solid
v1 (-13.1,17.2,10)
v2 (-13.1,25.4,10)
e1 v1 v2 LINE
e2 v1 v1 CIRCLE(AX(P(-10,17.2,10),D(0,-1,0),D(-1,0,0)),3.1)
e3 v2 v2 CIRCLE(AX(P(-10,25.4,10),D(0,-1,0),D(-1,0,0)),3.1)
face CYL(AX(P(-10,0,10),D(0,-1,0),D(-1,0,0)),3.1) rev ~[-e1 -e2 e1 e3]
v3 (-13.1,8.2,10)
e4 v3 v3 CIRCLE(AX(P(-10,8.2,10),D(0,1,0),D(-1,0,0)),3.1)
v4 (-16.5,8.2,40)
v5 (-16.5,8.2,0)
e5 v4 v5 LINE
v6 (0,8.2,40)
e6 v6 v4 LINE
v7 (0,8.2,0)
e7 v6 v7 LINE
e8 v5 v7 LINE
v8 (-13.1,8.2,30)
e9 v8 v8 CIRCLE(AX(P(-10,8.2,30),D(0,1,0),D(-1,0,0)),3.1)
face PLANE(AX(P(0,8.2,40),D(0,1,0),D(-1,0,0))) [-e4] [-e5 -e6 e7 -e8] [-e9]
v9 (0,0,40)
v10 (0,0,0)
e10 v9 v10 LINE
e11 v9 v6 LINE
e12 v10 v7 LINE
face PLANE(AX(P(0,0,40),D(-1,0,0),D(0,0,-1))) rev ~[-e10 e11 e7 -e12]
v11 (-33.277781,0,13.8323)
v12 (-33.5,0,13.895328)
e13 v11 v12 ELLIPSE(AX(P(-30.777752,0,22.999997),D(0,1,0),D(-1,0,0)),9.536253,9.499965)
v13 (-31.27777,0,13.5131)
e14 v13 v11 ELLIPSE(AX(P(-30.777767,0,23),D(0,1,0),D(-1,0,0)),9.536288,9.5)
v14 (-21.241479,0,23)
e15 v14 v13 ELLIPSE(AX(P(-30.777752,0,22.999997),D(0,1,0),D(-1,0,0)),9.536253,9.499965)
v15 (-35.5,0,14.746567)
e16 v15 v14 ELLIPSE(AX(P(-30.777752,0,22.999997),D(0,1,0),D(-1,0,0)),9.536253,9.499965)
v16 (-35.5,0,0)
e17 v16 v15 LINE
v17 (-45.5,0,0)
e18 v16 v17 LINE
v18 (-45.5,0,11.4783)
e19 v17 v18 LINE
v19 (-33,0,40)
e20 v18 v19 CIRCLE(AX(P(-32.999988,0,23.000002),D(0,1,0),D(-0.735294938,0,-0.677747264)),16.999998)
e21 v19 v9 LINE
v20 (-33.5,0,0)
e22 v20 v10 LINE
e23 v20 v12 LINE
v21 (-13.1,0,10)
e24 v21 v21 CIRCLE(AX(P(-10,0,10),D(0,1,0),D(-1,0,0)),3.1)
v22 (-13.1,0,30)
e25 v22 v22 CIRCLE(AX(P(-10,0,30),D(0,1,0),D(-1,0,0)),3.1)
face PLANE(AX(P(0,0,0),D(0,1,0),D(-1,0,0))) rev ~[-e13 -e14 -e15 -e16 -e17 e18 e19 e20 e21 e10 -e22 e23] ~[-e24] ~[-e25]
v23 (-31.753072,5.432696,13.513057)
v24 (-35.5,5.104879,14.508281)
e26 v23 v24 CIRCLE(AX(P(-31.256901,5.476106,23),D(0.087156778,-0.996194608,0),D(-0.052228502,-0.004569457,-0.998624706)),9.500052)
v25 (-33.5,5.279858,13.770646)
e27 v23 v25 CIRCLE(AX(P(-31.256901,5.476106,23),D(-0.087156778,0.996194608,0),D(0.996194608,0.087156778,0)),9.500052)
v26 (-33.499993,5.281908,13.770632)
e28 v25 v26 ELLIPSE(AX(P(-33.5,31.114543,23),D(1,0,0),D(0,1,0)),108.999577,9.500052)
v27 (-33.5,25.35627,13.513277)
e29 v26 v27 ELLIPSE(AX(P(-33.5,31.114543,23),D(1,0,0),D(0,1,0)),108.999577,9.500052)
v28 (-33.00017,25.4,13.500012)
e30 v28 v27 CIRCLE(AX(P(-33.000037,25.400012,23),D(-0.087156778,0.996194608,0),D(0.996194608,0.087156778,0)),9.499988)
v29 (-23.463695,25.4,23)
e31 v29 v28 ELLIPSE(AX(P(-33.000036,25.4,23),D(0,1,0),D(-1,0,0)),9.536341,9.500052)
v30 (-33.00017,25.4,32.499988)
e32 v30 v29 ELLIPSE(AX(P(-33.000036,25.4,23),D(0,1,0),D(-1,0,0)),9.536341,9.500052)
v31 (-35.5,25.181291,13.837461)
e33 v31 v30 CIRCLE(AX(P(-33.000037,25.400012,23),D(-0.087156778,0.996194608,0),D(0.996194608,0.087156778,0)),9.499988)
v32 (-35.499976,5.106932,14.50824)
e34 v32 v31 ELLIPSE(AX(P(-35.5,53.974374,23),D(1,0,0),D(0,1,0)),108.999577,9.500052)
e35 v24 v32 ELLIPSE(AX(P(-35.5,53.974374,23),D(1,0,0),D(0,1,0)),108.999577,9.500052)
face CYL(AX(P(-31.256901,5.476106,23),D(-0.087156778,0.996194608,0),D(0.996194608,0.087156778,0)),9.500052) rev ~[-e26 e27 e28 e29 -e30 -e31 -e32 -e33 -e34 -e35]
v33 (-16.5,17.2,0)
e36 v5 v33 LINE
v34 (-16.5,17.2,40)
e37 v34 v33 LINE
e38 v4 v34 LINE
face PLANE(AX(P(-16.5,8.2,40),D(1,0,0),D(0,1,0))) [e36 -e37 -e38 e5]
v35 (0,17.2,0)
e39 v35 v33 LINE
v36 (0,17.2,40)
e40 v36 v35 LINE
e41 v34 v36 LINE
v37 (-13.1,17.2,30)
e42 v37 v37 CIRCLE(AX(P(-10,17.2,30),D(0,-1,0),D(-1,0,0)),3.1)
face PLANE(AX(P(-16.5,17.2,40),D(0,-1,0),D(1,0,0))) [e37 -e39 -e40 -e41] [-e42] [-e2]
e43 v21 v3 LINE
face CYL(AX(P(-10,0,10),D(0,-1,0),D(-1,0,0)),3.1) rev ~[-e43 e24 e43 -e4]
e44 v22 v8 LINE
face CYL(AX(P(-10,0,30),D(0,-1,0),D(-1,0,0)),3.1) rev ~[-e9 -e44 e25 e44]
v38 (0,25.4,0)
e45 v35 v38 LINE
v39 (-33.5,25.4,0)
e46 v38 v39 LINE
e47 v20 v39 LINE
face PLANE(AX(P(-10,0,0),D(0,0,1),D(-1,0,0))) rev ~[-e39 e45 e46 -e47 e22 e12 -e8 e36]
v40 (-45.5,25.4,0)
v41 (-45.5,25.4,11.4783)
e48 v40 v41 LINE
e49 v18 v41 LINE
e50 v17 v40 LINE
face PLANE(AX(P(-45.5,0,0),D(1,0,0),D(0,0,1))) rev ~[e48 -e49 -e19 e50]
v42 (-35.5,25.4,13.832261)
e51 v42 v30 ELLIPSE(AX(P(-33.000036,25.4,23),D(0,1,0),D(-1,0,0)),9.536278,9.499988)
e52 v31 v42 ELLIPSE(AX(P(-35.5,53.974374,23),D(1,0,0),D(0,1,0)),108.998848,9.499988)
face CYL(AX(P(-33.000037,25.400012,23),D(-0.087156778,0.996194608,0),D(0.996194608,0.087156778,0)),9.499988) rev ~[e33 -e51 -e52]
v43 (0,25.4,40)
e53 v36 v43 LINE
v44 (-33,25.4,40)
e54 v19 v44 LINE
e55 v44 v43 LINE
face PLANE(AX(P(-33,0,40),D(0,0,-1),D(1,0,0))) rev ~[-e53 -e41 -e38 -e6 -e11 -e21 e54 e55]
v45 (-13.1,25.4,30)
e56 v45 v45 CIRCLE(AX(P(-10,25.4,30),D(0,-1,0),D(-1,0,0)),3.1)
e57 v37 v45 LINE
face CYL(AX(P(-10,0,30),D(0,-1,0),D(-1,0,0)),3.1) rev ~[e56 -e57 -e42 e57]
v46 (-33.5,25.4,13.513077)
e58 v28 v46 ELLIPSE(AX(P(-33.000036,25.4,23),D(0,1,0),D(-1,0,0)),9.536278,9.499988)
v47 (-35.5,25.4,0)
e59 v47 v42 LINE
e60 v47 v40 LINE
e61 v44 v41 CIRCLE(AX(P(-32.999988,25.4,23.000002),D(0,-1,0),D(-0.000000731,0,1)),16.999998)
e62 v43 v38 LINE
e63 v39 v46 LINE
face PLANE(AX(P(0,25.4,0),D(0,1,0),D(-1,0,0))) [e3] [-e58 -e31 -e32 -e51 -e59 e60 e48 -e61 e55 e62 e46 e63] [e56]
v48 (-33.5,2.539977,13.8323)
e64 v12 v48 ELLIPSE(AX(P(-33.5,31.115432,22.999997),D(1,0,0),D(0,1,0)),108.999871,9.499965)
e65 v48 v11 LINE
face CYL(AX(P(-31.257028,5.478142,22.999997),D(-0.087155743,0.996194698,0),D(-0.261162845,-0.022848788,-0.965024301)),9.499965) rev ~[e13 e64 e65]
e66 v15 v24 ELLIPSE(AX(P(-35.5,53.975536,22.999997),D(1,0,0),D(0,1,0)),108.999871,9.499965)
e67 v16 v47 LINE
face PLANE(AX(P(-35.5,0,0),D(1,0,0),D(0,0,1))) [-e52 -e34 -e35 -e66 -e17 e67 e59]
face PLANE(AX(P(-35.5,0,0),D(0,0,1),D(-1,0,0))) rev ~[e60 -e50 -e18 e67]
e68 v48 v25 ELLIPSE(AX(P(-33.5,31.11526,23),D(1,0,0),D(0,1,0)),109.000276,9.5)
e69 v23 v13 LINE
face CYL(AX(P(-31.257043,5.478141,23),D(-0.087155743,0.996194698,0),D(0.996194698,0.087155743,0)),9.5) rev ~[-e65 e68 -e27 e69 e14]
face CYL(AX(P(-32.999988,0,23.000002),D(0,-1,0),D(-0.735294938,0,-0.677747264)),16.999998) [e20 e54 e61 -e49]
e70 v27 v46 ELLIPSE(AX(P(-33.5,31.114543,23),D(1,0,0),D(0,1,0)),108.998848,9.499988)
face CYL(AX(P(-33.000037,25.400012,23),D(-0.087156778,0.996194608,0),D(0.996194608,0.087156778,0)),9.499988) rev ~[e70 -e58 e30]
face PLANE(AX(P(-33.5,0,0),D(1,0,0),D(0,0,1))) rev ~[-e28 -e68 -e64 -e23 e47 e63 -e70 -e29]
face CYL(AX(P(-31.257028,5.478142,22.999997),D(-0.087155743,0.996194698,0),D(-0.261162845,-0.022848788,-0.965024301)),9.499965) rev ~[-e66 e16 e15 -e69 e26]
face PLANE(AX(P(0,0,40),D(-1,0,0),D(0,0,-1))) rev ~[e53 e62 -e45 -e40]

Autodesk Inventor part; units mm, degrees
ref_plane "YZ Plane" through (0, 0, 0) normal (1, 0, 0) x (0, 1, 0)
ref_plane "XZ Plane" through (0, 0, 0) normal (0, 1, 0) x (-1, 0, 0)
ref_plane "XY Plane" through (0, 0, 0) normal (0, 0, 1) x (1, 0, 0)
sketch "Sketch1" plane through (0, 0, 0) normal (0, 1, 0) x (-1, 0, 0)
  line L0 (50, 0) -> (50, 40)
  line L1 (50, 40) -> (0, 40)
  line L2 (0, 40) -> (0, 0)
  line L3 (0, 0) -> (10, 0)
  line L4 (10, 0) -> (10, 10)
  line L5 (10, 10) -> (10, 30)
  circle A0 centre (10, 30) radius 3.1
  circle A1 centre (10, 10) radius 3.1
  line L6 (45.5, 0) -> (45.5, 11.4783)
  line L7 (0, 0) -> (33.5, 0)
  line L8 (35.5, 0) -> (35.5, 18.6699)
  line L9 (50, 40) -> (45.5, 40)
  line L10 (45.5, 40) -> (45.5, 35.5)
  line L11 (45.5, 35.5) -> (45.5, 34.5217)
  line L12 (45.5, 23) -> (33, 23)
  arc A2 (45.5, 11.4783) -> (33, 40) centre (33, 23) ccw
  line L13 (0, 0) -> (33.5, 0)
  line L14 (35.5, 0) -> (45.5, 0)
  line L15 (33.5, 0) -> (33.5, 18.0251)
  line L16 (0, 0) -> (33.5, 0)
  line L17 (35.5, 0) -> (45.5, 0)
  line L18 (33, 23) -> (28, 23)
  line L19 (33, 23) -> (38, 23)
  arc A3 (35.5, 18.6699) -> (38, 23) centre (33, 23) ccw
  arc A4 (28, 23) -> (33.5, 18.0251) centre (33, 23) ccw
  dimension "d0" = 50
  dimension "d1" = 40
  dimension "d2" = 10
  dimension "d3" = 10
  dimension "d4" = 20
  dimension "d5" = 6.2
  dimension "d6" = 6.2
  dimension "d7" = 45.5
  dimension "d8" = 35.5
  dimension "d9" = 4.5
  dimension "d10" = 4.5
  dimension "d13" = 12.5
  dimension "d14" = 12.5
  dimension "d15" = 2
extrude "Extrusion1" add sketch "Sketch1" along normal blind 25.4 contours A2 L6 L14 L8 A3 L12 L18 A4 L15 L7 L3 L2 L1
sketch "Sketch2" plane through (-33, 0, 40) normal (0, 0, 1) x (1, 0, 0)
  line L0 (33, 0) -> (33, 8.2)
  line L1 (33, 0) -> (33, 25.4) projected
  line L2 (33, 8.2) -> (16.5, 8.2)
  line L3 (16.5, 8.2) -> (16.5, 17.2)
  line L4 (16.5, 17.2) -> (33, 17.2)
  line L5 (33, 17.2) -> (33, 8.2)
  dimension "d18" = 8.2
  dimension "d19" = 16.5
  dimension "d20" = 9
extrude "Extrusion2" cut sketch "Sketch2" against normal through all
sketch "Sketch5" plane through (-28, 0, 23) normal (0, 0, -1) x (-1, 0, 0)
  line L0 (5, 25.4) -> (-4.4638, 26.228)
  line L1 (5, 25.4) -> (14.5, 25.4) construction
  line L2 (-4.4638, 26.228) -> (-3.5923, 36.1899)
  line L3 (-3.5923, 36.1899) -> (15.3354, 34.534)
  line L4 (15.3354, 34.534) -> (12.7207, 4.6481)
  line L5 (12.7207, 4.6481) -> (-6.207, 6.3041)
  line L6 (-6.207, 6.3041) -> (-3.5923, 36.1899)
  line L7 (3.2569, 5.4761) -> (5.8716, 35.3619)
  point P0 (-28, 0)
  dimension "d25" = 9.5
  dimension "d26" = 175
  dimension "d27" = 10
  dimension "d28" = 19
  dimension "d29" = 30
  dimension "d30" = 90
  dimension "d31" = 19
revolve "Revolution1" cut sketch "Sketch5" angle 360 about axis through (-31.2569, 5.4761, 23) along (-0.0871557, 0.9961947, 0) contours L7 L5 L6 L0 | L0 L2 L3 L7
sketch "Sketch6" plane through (-33.5, 5.2799, 18.0251) normal (-0.0871557, 0.9961947, 0) x (0.9961947, 0.0871557, 0)
  arc A0 (-0.2388, 4.1928) -> (1.7536, 4.512) centre (2.2517, -4.9749) ccw projected
  circle A1 centre (2.2517, -4.9749) radius 9.5
  point P0 (32.9124, 18.0251)
extrude "Extrusion3" cut sketch "Sketch6" against normal blind 10
properties part number "suporte-eixo"
